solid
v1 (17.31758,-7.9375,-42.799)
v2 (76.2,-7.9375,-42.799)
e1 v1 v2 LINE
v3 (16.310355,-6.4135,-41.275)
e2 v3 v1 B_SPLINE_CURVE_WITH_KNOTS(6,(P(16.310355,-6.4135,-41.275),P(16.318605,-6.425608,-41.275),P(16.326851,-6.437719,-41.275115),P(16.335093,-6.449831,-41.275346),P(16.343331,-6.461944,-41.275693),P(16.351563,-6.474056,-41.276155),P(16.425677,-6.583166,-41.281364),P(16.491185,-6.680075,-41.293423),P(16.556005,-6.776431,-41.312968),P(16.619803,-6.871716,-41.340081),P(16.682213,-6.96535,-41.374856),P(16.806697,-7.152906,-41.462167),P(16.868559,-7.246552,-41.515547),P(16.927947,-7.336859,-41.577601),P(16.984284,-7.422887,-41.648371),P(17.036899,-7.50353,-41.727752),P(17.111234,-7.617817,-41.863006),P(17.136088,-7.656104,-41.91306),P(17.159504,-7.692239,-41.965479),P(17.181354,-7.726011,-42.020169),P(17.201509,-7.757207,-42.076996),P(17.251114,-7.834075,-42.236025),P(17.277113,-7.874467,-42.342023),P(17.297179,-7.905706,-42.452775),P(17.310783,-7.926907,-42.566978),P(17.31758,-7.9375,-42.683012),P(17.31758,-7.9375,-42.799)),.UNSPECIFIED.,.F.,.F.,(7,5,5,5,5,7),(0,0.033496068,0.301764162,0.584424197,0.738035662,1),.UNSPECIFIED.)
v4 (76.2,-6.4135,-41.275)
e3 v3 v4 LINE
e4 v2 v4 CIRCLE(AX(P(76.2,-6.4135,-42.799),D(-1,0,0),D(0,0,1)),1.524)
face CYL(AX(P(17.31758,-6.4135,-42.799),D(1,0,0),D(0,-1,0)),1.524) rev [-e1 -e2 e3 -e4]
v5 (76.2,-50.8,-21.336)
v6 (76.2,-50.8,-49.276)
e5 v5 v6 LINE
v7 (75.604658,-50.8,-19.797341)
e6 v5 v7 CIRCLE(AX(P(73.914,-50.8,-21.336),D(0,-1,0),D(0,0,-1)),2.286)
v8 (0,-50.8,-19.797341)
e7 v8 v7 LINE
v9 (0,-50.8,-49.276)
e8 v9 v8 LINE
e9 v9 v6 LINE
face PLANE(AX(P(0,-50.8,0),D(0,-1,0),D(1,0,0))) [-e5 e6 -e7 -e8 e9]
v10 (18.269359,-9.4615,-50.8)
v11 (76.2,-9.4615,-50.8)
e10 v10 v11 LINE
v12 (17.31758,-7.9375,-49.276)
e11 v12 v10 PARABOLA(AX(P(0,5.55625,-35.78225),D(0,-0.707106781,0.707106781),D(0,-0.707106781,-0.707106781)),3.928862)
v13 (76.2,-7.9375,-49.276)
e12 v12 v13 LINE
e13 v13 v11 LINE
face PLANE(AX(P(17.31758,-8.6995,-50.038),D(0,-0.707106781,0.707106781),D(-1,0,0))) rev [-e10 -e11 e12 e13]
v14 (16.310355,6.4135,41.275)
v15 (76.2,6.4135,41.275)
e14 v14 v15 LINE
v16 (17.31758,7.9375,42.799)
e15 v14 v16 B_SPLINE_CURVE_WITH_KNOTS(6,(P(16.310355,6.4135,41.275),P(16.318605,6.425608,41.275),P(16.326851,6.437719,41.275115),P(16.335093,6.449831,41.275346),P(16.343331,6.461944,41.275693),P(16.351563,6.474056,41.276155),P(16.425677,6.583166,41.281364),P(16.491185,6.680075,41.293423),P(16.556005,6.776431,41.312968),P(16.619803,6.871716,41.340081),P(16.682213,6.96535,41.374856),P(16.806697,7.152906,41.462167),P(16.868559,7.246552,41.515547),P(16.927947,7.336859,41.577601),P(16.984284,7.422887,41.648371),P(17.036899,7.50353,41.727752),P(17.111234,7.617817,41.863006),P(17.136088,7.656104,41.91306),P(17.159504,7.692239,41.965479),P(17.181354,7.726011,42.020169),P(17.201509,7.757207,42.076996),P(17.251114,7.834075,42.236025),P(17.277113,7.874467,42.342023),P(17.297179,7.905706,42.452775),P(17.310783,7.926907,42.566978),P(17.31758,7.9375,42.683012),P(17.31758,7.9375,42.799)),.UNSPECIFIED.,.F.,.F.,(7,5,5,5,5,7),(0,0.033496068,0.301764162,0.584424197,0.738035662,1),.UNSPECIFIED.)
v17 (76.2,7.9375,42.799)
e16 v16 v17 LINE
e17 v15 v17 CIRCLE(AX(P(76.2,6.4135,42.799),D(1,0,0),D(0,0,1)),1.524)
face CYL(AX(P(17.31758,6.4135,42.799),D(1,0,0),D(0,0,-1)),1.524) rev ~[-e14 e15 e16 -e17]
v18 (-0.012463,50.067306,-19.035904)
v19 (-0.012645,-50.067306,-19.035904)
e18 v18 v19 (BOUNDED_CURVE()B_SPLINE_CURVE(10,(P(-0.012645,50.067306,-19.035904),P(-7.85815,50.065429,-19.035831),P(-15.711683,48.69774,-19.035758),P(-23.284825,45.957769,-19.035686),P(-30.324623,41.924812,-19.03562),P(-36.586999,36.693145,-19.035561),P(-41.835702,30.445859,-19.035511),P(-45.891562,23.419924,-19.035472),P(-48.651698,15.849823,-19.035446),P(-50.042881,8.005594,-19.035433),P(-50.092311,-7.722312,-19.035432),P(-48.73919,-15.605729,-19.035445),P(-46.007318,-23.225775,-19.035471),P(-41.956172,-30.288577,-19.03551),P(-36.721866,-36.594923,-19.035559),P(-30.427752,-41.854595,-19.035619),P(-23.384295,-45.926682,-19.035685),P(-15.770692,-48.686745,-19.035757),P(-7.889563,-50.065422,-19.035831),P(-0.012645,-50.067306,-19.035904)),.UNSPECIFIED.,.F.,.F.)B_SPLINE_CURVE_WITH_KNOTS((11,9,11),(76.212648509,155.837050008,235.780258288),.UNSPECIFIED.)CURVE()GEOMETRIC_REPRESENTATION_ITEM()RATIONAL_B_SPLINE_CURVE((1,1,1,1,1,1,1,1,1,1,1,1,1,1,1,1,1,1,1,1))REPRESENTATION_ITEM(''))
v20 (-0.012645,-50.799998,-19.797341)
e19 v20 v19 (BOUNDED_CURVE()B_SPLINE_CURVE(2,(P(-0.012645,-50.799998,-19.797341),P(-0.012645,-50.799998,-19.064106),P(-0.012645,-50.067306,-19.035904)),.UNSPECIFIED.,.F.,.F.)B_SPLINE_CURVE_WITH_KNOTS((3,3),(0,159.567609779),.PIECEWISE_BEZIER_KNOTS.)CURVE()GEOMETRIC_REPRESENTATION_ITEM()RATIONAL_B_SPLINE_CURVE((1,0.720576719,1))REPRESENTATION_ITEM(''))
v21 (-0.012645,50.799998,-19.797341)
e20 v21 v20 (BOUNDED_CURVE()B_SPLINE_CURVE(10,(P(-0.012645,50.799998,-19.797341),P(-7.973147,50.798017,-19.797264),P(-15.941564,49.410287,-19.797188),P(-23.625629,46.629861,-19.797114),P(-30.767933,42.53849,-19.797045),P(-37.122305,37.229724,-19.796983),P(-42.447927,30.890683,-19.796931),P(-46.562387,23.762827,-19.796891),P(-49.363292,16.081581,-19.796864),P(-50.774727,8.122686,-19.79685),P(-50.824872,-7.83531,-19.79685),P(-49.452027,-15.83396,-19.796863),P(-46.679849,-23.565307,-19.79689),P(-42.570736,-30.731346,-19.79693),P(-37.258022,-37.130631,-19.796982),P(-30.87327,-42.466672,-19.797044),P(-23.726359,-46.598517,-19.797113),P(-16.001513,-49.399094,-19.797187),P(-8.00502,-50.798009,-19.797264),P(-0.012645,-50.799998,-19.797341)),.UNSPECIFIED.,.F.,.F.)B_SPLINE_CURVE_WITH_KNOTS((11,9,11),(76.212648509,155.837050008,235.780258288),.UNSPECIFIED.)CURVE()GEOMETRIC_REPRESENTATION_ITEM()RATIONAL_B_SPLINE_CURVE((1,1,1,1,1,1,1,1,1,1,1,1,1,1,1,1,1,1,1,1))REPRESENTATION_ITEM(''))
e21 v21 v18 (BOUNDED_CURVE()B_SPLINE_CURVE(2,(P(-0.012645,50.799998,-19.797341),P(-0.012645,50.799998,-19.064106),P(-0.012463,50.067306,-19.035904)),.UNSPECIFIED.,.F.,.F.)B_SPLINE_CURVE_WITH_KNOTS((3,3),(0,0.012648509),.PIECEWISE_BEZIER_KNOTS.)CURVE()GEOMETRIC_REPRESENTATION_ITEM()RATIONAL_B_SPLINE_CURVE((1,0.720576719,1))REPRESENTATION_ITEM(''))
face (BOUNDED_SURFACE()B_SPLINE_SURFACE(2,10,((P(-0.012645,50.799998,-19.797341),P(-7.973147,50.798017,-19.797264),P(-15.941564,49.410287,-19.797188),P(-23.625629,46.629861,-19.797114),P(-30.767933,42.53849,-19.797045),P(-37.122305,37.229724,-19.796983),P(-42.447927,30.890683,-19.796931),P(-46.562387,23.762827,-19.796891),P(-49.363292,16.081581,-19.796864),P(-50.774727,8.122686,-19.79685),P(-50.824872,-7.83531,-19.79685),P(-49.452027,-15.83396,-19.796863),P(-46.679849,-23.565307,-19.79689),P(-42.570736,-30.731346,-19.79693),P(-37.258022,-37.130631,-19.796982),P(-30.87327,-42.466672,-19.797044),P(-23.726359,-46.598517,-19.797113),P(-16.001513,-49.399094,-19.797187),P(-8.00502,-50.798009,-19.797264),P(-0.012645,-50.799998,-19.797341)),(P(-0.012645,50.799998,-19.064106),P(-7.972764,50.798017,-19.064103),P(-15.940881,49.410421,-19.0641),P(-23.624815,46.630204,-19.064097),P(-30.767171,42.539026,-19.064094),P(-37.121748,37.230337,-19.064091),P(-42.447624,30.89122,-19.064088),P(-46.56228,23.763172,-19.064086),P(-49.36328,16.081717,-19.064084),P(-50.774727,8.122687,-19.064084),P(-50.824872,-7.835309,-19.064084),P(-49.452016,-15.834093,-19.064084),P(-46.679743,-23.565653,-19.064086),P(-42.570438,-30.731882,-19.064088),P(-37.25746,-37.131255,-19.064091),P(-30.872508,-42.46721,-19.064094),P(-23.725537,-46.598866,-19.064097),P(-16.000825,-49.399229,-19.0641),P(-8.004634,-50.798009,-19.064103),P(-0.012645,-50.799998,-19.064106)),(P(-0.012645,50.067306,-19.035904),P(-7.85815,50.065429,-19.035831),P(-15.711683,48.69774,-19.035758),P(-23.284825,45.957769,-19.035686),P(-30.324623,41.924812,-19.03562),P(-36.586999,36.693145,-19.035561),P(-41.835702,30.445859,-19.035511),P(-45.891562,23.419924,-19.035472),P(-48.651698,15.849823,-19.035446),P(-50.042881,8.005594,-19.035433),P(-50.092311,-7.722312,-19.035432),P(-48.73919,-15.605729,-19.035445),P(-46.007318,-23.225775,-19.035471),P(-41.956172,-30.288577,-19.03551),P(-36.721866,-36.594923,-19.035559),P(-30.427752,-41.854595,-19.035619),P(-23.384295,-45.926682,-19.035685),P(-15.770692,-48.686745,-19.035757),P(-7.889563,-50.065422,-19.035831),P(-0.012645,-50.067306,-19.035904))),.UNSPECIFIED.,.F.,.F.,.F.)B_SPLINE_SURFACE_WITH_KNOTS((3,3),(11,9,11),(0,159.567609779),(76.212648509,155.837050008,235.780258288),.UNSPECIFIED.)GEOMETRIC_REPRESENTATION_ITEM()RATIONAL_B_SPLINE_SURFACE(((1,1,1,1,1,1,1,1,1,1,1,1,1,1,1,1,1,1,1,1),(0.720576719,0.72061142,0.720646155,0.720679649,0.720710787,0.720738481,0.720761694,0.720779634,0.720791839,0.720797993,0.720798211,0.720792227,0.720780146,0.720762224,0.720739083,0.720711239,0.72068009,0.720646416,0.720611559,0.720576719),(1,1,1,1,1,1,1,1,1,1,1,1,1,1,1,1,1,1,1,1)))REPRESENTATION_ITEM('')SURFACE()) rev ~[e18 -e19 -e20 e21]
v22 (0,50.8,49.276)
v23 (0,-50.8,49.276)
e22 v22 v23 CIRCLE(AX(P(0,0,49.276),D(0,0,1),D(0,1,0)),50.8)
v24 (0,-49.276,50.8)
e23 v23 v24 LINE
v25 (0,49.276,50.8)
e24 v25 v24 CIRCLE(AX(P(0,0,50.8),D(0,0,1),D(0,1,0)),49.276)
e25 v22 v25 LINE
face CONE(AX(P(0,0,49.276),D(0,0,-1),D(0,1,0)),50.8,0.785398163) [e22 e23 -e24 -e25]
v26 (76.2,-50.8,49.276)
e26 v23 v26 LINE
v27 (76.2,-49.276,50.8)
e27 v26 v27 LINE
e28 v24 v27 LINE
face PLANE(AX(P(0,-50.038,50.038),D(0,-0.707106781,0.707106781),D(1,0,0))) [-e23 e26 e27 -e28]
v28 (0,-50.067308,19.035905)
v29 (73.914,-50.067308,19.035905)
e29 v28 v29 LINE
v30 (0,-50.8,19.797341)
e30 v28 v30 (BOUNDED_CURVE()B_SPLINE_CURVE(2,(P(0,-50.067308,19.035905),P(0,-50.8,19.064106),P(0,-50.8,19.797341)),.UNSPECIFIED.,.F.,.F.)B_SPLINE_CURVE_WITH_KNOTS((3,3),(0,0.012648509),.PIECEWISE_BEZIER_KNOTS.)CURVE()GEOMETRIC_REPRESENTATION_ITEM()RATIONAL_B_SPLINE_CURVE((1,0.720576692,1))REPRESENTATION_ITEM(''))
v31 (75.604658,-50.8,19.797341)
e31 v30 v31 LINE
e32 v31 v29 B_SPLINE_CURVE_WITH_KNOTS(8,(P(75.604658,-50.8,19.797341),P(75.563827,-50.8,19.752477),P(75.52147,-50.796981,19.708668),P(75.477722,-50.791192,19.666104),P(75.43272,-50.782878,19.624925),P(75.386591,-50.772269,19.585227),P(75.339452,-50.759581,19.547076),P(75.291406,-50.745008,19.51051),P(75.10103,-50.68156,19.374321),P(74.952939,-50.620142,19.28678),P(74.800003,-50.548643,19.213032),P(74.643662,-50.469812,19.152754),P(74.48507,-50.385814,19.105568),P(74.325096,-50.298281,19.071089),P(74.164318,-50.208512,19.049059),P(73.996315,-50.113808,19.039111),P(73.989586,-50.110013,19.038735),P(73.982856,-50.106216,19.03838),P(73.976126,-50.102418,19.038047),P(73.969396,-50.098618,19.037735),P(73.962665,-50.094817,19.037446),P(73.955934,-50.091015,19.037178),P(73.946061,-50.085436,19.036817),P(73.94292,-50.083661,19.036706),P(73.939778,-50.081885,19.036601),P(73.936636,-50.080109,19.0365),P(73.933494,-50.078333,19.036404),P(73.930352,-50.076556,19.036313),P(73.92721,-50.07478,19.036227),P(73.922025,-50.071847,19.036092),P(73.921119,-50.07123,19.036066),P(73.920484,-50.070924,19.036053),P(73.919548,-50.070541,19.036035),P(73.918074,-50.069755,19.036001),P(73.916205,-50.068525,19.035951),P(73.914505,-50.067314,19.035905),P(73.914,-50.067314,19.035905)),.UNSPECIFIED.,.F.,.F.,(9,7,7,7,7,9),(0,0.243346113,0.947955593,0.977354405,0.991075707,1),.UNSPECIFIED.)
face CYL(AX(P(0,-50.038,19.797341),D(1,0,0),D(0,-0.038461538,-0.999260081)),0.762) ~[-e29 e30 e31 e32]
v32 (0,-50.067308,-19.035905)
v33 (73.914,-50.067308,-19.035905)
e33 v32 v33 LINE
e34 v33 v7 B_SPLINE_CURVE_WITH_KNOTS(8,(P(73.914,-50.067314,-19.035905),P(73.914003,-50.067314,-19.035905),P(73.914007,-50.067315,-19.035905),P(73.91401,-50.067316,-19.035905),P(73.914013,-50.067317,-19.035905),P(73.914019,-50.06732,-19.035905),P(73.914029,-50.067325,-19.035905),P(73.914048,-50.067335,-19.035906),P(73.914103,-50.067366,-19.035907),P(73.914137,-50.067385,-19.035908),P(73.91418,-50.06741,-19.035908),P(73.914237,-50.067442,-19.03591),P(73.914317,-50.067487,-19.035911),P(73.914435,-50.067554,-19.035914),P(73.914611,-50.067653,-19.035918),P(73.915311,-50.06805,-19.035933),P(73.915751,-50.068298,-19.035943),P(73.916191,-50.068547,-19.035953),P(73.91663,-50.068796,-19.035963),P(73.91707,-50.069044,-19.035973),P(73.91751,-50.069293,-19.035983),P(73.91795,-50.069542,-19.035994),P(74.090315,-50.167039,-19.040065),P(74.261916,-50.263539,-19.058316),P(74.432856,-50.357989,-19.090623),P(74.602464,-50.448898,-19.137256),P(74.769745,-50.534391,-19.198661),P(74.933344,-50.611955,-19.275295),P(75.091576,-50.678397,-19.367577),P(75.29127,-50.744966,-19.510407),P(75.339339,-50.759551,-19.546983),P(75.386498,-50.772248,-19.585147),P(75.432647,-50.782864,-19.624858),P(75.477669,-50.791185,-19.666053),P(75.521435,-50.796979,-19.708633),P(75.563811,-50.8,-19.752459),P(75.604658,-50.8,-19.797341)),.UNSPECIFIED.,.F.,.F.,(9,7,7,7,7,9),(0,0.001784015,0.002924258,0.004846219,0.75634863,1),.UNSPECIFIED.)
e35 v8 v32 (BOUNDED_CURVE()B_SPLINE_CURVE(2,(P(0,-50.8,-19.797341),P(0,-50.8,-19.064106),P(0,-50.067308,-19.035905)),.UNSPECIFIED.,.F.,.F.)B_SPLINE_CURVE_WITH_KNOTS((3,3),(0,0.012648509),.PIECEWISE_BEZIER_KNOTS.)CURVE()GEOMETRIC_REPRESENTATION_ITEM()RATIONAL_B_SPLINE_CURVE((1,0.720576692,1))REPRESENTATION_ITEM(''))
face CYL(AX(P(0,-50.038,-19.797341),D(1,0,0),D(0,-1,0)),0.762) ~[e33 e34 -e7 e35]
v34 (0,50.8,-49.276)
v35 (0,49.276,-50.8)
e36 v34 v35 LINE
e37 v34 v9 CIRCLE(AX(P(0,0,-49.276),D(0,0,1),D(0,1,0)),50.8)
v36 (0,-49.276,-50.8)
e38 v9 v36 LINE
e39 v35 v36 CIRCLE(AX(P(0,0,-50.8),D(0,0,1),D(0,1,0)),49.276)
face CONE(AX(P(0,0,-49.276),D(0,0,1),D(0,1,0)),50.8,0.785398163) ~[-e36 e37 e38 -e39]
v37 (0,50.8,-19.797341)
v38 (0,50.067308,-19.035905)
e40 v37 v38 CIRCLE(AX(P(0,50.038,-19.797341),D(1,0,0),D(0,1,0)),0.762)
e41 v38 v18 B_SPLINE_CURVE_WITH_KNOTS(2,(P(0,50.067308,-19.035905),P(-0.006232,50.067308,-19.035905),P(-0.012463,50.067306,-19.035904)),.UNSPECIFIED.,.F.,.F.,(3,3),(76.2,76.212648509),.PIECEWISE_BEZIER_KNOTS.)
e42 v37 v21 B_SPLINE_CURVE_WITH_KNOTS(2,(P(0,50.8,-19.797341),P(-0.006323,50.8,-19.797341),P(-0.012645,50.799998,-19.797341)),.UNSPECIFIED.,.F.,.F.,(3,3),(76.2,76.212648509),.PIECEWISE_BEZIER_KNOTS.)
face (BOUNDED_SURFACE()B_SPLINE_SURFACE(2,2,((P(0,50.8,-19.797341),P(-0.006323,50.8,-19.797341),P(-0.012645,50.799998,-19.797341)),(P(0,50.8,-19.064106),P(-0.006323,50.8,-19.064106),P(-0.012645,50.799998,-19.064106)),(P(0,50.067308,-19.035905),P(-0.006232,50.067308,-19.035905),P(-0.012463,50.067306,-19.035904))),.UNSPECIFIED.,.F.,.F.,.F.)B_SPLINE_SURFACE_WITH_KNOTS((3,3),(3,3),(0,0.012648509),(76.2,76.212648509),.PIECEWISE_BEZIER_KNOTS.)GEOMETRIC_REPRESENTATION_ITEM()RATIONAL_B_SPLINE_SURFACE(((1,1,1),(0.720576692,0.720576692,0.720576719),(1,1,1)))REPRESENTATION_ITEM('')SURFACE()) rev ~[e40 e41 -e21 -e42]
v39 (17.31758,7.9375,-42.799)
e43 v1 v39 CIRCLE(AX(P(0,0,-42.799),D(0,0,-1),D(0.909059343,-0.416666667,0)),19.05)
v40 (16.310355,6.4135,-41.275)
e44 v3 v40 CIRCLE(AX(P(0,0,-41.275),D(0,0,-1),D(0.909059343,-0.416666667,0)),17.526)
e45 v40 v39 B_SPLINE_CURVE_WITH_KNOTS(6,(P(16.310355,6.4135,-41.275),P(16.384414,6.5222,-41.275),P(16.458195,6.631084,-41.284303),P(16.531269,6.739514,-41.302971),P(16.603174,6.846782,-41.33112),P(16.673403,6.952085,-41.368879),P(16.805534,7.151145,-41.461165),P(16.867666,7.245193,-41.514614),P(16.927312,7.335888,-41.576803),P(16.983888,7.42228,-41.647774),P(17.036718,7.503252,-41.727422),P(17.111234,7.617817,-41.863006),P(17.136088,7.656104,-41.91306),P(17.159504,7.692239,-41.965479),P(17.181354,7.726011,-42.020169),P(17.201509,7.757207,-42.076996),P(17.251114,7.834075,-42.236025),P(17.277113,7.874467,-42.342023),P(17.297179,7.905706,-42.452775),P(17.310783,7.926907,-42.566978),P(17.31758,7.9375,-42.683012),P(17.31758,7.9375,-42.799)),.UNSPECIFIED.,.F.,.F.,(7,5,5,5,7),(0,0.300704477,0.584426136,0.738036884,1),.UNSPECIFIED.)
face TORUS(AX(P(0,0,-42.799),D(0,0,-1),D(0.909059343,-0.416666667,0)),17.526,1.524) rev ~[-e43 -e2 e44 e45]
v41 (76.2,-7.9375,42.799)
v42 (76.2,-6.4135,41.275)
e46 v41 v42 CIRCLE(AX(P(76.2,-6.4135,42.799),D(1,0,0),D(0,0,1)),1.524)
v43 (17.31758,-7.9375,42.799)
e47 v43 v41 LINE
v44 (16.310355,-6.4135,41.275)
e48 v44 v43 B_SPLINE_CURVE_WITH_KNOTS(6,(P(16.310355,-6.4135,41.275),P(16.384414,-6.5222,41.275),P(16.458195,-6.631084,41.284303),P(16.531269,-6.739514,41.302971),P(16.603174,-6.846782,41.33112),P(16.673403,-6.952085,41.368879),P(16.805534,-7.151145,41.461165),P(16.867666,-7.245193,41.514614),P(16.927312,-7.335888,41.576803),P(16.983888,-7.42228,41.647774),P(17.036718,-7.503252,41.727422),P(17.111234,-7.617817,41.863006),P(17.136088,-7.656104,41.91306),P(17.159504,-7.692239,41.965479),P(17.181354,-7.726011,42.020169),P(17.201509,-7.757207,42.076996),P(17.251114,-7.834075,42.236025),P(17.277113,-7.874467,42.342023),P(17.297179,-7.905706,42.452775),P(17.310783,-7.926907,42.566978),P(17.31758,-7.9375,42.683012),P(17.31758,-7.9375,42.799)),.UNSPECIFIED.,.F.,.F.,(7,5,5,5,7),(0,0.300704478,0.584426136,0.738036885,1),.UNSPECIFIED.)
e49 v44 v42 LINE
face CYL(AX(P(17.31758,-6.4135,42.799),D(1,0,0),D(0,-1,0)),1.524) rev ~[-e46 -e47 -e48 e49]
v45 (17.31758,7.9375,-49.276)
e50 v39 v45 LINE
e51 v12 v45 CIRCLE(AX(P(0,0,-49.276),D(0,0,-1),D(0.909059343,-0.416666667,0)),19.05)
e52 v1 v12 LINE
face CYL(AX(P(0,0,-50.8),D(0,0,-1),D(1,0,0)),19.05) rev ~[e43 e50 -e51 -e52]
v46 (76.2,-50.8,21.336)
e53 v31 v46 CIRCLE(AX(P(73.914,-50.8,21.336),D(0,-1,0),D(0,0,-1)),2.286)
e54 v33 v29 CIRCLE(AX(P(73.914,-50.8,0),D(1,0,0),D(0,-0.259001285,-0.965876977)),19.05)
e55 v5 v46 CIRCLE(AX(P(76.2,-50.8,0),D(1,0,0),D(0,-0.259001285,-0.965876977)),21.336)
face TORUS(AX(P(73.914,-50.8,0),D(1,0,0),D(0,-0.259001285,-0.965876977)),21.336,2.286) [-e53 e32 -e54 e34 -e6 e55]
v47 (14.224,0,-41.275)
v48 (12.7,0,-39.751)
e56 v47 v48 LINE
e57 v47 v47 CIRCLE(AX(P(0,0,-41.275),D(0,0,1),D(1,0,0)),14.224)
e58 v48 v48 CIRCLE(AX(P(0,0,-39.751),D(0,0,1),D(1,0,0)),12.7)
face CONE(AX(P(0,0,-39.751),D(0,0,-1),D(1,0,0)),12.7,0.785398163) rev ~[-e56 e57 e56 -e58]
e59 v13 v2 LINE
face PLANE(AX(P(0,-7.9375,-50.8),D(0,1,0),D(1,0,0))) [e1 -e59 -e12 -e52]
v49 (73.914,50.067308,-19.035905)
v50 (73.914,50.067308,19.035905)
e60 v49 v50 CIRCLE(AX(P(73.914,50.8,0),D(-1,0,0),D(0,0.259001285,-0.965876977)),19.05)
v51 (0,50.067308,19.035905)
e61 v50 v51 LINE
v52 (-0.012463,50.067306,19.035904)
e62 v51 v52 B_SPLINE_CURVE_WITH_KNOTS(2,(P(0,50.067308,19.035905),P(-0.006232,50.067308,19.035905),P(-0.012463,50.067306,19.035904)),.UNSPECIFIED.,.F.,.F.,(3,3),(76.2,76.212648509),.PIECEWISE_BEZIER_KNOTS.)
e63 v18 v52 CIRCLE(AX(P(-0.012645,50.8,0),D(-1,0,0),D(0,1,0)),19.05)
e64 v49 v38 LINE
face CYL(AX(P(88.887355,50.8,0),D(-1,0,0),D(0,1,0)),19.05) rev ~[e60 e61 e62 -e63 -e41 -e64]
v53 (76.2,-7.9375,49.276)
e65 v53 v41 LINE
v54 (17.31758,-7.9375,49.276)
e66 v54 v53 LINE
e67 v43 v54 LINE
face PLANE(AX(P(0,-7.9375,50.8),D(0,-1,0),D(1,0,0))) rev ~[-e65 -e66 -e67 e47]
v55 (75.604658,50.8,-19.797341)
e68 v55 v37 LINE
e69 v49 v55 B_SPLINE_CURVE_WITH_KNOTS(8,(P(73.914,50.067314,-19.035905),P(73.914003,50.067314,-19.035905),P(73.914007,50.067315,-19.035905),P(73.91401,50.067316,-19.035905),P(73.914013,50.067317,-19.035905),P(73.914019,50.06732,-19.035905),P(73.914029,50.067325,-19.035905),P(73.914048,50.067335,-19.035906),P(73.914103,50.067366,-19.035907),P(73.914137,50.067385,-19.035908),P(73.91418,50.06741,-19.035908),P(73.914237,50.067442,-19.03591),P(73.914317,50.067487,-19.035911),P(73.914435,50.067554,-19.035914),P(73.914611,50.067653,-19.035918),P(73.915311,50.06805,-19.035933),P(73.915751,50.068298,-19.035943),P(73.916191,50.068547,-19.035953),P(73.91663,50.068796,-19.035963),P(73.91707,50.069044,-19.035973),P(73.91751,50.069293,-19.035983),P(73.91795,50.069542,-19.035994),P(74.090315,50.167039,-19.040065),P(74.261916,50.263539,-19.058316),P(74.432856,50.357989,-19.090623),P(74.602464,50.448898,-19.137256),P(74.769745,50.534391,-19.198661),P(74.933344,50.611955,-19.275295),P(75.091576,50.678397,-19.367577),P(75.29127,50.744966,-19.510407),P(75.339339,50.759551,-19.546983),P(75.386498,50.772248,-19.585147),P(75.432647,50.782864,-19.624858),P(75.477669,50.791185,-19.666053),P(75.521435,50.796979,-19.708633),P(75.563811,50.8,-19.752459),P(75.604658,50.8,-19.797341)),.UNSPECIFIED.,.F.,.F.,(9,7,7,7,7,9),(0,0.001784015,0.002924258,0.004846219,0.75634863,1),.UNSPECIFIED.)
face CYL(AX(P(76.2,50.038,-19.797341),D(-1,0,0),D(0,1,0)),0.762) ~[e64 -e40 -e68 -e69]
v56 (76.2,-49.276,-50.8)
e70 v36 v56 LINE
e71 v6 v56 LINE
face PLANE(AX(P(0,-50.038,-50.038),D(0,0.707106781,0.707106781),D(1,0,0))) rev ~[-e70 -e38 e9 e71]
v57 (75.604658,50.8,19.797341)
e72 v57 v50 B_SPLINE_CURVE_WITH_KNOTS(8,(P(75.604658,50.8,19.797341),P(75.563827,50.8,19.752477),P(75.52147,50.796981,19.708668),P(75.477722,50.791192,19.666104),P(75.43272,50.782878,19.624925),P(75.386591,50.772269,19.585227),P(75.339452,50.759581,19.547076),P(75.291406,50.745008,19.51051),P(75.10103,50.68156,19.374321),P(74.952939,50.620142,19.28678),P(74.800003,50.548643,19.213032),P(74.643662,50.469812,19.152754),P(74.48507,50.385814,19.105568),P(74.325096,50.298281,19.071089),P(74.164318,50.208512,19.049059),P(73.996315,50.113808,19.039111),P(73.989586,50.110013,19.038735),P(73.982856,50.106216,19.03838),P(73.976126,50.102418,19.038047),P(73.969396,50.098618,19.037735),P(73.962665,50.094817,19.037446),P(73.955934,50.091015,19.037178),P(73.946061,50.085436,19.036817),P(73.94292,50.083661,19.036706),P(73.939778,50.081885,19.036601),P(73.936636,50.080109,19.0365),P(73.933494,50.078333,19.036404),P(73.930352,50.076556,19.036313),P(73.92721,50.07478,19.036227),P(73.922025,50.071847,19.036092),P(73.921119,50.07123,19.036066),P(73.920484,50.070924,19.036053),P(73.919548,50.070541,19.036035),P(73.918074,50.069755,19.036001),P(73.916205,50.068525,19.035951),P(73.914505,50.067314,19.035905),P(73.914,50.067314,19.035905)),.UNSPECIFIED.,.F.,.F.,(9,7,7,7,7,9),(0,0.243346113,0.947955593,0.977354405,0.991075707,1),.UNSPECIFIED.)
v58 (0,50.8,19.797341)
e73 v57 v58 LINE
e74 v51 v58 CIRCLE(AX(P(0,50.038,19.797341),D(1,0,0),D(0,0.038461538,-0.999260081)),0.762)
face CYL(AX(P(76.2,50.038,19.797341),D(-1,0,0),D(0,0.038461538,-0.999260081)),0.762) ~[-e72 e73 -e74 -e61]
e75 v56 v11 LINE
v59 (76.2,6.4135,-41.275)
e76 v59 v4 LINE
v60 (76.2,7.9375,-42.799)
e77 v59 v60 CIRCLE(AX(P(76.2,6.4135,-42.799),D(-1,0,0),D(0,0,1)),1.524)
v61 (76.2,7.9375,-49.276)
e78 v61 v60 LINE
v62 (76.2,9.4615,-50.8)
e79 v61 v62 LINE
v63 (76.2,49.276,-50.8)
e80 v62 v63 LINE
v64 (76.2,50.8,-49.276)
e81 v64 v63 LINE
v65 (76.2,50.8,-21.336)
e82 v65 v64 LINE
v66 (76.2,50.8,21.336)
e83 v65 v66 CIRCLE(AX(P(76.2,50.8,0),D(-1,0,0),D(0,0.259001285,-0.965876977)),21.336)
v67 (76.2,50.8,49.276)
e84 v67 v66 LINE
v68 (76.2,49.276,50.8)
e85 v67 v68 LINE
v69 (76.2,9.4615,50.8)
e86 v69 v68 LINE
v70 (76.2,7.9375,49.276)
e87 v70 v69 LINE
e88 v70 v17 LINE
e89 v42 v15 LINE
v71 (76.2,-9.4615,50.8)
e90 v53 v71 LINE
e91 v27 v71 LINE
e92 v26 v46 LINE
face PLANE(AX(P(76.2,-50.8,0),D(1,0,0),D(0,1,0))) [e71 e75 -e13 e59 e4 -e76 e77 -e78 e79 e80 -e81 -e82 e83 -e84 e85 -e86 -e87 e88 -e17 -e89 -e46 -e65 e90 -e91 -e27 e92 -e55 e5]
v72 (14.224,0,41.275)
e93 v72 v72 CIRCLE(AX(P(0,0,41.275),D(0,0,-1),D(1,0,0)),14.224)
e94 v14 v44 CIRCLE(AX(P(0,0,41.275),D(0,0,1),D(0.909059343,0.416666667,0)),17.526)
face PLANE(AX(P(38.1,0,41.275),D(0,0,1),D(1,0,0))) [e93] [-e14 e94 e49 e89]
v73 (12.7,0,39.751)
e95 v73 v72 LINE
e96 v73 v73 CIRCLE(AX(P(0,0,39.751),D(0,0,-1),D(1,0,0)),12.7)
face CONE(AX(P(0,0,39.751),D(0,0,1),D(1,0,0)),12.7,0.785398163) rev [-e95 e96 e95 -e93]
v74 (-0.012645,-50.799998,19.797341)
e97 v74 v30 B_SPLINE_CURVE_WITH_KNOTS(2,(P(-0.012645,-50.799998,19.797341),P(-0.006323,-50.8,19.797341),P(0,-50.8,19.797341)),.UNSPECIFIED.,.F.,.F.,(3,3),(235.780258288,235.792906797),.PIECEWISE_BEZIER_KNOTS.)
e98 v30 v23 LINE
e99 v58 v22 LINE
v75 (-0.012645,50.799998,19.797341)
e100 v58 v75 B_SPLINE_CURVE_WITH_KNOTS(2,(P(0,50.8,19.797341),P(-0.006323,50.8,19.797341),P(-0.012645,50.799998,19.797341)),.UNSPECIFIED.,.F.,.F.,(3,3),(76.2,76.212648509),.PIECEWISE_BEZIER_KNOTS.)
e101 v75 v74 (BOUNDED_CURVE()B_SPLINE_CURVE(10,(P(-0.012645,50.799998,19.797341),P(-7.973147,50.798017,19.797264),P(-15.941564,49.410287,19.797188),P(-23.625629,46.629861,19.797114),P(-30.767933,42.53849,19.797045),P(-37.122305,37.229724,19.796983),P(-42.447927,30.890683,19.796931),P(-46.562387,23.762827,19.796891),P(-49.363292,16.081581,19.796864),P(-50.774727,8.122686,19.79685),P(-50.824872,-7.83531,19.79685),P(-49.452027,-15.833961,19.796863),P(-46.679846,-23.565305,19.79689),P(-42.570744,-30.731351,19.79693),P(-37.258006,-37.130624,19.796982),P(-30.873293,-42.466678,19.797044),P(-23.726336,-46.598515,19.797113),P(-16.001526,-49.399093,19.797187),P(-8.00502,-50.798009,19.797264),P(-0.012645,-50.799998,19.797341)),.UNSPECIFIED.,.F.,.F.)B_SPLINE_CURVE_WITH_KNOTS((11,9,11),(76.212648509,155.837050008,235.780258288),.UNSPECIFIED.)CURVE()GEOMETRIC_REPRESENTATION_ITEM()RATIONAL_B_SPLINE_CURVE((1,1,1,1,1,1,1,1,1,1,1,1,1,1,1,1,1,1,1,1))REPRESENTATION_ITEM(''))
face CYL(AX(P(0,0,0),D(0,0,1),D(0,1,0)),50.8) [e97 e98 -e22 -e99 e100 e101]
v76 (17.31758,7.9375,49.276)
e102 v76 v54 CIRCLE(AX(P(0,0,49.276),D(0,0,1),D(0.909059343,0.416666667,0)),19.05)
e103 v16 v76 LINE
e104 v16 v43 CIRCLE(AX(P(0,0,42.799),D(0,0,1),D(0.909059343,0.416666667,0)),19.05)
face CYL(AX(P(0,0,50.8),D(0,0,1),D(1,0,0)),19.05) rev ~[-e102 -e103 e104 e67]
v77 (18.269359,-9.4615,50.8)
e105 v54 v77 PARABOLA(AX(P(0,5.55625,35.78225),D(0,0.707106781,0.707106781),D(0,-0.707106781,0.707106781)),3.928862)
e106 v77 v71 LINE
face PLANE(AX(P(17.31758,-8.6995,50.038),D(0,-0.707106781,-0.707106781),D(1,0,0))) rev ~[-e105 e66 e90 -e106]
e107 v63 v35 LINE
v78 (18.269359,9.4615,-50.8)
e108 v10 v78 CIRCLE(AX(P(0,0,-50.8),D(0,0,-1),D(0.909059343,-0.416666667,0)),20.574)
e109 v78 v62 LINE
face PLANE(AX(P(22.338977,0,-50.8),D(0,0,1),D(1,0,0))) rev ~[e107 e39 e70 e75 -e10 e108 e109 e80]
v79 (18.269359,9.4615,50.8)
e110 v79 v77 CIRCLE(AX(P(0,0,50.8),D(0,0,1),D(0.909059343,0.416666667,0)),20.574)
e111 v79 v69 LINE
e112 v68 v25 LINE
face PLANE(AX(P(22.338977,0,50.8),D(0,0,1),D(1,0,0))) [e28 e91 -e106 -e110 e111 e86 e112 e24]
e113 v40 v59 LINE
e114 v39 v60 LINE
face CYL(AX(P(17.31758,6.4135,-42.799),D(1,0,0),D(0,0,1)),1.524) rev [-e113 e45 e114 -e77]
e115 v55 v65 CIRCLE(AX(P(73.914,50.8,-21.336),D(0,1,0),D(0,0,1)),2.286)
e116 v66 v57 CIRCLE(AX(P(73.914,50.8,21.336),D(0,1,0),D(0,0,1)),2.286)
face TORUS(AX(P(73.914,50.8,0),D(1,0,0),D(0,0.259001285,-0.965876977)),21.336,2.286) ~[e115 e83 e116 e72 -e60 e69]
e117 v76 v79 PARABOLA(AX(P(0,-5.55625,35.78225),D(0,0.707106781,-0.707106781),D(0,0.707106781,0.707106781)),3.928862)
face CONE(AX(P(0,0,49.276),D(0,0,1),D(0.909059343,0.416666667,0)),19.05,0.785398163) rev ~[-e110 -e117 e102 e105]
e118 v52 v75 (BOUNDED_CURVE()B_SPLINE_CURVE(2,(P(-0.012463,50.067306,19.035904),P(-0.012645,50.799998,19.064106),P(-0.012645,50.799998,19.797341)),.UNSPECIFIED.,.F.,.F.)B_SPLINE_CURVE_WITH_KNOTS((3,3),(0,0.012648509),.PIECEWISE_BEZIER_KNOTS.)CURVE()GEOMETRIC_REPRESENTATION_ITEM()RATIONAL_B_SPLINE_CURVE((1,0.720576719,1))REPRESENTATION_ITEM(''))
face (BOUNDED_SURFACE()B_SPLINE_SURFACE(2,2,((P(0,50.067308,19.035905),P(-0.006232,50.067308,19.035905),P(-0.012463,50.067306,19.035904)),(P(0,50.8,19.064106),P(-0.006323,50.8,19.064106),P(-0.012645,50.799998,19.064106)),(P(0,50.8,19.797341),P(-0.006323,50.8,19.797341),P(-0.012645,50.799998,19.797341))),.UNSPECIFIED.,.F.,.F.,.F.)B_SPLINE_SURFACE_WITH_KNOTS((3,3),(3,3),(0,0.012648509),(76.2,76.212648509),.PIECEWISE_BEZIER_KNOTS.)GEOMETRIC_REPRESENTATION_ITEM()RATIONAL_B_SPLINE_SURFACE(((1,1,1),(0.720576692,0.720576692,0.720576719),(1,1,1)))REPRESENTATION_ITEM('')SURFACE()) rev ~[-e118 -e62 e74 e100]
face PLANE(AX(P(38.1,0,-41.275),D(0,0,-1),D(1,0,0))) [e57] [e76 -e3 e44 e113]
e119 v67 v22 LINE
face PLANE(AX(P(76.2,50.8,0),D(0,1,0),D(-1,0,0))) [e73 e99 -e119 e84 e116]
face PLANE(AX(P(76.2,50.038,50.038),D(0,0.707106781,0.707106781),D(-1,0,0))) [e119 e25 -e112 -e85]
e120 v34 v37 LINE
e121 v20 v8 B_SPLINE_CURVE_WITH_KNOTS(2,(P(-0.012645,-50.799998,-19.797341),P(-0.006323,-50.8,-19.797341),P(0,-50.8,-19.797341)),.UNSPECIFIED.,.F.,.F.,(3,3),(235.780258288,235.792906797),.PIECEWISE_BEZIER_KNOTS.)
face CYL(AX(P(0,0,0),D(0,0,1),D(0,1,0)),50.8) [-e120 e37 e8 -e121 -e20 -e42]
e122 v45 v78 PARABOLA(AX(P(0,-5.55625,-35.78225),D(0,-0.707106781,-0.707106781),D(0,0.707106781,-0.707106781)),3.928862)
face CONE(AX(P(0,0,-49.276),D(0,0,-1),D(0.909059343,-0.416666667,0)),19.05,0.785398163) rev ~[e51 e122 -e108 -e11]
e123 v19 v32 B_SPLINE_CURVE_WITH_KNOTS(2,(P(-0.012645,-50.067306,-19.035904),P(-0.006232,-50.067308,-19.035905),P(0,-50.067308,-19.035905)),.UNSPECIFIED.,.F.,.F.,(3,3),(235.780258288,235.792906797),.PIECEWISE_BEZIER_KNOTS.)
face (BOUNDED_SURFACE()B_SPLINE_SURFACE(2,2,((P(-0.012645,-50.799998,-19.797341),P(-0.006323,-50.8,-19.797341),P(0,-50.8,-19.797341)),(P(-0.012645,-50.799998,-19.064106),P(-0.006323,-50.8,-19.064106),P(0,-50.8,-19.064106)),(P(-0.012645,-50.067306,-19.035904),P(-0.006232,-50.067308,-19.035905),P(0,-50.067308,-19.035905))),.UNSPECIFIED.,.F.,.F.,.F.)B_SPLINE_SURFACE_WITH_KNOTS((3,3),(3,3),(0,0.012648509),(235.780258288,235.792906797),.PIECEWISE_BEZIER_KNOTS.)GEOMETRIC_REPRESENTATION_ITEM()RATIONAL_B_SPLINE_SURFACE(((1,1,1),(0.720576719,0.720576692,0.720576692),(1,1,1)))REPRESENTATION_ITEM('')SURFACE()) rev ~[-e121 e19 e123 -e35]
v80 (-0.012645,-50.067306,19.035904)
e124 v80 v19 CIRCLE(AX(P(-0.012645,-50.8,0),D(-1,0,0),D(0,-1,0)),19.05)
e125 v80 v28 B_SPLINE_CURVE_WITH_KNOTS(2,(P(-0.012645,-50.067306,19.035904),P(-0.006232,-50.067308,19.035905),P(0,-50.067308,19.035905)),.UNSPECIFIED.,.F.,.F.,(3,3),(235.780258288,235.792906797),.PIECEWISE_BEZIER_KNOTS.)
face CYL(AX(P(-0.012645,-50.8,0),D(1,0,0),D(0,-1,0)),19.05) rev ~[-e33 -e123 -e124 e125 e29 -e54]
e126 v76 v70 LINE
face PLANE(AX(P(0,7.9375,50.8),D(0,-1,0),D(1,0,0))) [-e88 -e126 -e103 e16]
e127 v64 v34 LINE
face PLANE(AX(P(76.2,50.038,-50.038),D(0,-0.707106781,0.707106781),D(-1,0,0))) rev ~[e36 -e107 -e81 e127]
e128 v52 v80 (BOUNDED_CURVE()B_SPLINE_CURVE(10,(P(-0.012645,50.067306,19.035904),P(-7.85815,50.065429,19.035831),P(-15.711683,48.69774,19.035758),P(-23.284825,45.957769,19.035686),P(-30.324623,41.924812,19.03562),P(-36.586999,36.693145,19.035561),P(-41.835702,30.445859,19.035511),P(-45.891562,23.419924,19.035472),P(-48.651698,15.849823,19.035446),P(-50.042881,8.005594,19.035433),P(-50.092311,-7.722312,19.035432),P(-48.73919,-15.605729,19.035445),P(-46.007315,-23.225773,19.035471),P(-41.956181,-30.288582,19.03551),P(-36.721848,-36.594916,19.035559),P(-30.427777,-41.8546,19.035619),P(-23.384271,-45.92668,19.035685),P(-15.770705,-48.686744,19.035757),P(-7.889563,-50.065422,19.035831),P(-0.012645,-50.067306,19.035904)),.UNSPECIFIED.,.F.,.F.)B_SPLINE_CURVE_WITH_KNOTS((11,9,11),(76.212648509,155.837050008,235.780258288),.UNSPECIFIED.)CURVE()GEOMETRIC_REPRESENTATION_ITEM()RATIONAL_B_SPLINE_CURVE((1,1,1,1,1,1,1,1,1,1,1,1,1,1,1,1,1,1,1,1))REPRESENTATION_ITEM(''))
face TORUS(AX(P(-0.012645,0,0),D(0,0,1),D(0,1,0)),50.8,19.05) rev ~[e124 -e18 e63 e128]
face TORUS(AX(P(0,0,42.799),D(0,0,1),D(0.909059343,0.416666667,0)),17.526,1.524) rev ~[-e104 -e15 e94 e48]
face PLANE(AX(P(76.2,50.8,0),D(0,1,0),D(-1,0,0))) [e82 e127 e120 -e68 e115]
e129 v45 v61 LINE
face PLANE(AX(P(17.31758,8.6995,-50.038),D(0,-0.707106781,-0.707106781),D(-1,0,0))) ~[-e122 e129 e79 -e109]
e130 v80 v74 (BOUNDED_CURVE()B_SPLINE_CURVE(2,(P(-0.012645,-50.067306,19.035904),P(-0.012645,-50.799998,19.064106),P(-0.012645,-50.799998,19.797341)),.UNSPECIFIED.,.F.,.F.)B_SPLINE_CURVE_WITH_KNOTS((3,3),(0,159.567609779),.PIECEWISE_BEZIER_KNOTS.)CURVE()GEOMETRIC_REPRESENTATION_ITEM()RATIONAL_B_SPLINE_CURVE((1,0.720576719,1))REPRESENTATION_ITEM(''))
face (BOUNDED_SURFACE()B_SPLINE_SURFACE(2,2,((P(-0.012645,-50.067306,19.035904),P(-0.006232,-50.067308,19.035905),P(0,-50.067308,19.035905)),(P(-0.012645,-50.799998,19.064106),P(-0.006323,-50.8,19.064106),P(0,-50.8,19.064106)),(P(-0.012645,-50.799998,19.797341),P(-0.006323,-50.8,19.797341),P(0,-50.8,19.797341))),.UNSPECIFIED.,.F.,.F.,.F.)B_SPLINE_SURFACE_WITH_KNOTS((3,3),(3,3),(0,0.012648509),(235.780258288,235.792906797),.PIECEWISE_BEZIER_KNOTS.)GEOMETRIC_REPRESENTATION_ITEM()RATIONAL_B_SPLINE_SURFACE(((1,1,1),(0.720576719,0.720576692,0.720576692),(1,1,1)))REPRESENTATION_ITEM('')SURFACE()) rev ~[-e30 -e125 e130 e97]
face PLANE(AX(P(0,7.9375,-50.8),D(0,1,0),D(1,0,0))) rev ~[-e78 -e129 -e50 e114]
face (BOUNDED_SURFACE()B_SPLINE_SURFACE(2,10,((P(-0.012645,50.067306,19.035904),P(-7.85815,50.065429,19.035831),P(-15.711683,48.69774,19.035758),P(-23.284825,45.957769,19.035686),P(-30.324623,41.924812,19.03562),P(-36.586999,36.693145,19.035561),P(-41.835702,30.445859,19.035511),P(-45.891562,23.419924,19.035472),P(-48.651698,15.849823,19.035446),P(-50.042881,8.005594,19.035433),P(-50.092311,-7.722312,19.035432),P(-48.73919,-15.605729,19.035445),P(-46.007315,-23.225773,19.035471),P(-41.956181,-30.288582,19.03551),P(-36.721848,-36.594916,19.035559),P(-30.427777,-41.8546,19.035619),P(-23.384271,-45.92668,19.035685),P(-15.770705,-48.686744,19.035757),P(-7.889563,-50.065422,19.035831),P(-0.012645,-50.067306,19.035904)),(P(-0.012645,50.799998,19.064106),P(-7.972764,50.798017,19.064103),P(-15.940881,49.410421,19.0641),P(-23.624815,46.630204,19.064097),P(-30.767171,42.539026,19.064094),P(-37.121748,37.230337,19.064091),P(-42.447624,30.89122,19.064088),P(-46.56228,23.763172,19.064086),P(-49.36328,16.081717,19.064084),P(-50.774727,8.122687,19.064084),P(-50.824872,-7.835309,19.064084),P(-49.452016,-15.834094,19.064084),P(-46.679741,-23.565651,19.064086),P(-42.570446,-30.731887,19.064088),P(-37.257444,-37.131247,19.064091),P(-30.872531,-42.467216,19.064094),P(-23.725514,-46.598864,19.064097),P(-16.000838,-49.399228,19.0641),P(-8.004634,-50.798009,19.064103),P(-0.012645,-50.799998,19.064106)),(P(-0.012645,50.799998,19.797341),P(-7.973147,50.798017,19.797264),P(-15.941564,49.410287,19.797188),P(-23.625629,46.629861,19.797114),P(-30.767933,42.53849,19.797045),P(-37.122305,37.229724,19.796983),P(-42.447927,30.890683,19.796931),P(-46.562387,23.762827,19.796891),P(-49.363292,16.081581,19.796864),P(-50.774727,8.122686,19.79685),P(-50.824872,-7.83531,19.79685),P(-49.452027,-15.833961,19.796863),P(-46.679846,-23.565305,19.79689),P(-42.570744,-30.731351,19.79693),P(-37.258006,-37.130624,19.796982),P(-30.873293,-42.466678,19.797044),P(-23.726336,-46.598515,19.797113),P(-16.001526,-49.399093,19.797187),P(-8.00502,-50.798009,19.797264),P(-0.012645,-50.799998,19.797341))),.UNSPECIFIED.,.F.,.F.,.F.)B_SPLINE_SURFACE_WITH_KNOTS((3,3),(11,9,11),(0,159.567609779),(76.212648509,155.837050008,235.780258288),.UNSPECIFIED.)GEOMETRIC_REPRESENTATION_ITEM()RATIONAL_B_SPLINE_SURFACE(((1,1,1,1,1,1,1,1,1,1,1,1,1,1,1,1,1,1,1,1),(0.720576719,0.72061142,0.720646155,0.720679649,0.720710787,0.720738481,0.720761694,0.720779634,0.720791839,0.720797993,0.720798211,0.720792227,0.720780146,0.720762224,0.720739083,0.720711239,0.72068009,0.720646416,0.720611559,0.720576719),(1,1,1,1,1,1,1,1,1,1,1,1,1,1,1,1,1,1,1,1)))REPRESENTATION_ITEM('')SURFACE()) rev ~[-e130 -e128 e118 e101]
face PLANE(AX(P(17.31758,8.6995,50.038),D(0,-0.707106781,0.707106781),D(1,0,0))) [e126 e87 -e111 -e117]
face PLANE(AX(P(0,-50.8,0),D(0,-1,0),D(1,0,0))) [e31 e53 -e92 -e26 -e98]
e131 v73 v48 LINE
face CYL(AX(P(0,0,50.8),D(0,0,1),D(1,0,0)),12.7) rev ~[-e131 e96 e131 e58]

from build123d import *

# Parameters (mm, degrees)
F1_DEPTH     = 50.8
F4_R         = 19.05
F6_R         = 12.7
F7_DEPTH     = 101.6010001
F8_R         = 19.05
F9_DEPTH     = 9.525
F10_R        = 19.05
F11_DEPTH    = 9.525
F12_SIZE     = 1.524
F13_R        = 0.762
F14_T2_ANGLE = 210.0216204264
F14_T4_ANGLE = 210.0216204264
F15_W        = 76.2
F15_H        = 15.875
F16_DEPTH    = 9.525
F17_W        = 76.2
F17_H        = 15.875
F18_DEPTH    = 9.525
F19_SIZE     = 1.524
F20_R        = 1.524


# Not quite as in the source:
# - a fillet or chamfer that OpenCascade refuses, or shapes differently, is made with other operations: its cross-section is extruded or revolved along the edge and cut away or added


with BuildPart() as f1:
    # F0 (on Top) → F1 (new body, symmetric)
    with BuildSketch(Plane.XY):
        with BuildLine():
            Line((76.2, 50.8), (0, 50.8))
            ThreePointArc((0, 50.8), (-50.8, 0), (0, -50.8))
            Line((0, -50.8), (76.2, -50.8))
            Line((76.2, -50.8), (76.2, 50.8))
        make_face()
    extrude(amount=F1_DEPTH, both=True)

    # F5: sweep along a path in F2
    with BuildLine(Plane.XY) as f5_path:
        Line((88.8873545716, 50.8), (-0.0126454284, 50.8))
        ThreePointArc((-0.0126454284, 50.8), (-50.8126454284, 0), (-0.0126454284, -50.8))
        Line((-0.0126454284, -50.8), (88.8873545716, -50.8))
    # F4 (on line) → F5 (sweep, cut)
    with BuildSketch(Plane.YZ.offset(88.8873545716)):
        with Locations((50.8, 0)):
            Circle(F4_R)
    sweep(path=f5_path.line, mode=Mode.SUBTRACT)

    # F6 (on face) → F7 (cut, through all)
    with BuildSketch(Plane.XY.offset(50.8)):
        Circle(F6_R)
    extrude(amount=-F7_DEPTH, mode=Mode.SUBTRACT)

    # F8 (on face) → F9 (cut)
    with BuildSketch(Plane.XY.offset(50.8)):
        Circle(F8_R)
    extrude(amount=-F9_DEPTH, mode=Mode.SUBTRACT)

    # F10 (on face) → F11 (cut)
    with BuildSketch(Plane(origin=(0, 0, -50.8), x_dir=(1, 0, 0), z_dir=(0, 0, -1))):
        Circle(F10_R)
    extrude(amount=-F11_DEPTH, mode=Mode.SUBTRACT)

    # F12
    f12_edges = [f1.edges().sort_by_distance(p)[0] for p in [
        (38.1, -50.8, 50.8),
        (38.1, 50.8, -50.8),
    ]]
    chamfer(f12_edges, length=F12_SIZE)

    # F13
    f13_edges = [f1.edges().sort_by_distance(p)[0] for p in [
        (38.1, -50.8, -19.05),
        (38.1, -50.8, 19.05),
        (-0.006323, 50.799999, -19.05),
        (-50.8, 0, -19.049996),
        (-0.006323, -50.799999, -19.05),
        (-0.006323, -50.799999, 19.05),
        (38.1, 50.8, -19.05),
        (-0.006323, 50.799999, 19.05),
        (38.1, 50.8, 19.05),
        (-50.8, 0, 19.049996),
    ]]
    fillet(f13_edges, radius=F13_R)

    # F14: fillet of radius 2.286 on 2 edges, made by hand

    # F14_s1 → F14_t2 (revolve, cut)
    with BuildSketch(Plane(origin=(0, 47.3922513753, 12.7082996284), x_dir=(1, 0, 0), z_dir=(0, 0.9658769767, 0.2590012854))):
        with BuildLine():
            ThreePointArc((76.2, 34.4932652985), (75.5304461018, 32.8768191967), (73.914, 32.2072652985))
            Line((73.914, 32.2072652985), (76.2, 32.2072652985))
            Line((76.2, 32.2072652985), (76.2, 34.4932652985))
        make_face()
    revolve(axis=Axis((76.2, 50.8, 0), (-1, 0, 0)), revolution_arc=F14_T2_ANGLE, mode=Mode.SUBTRACT)

    # F14_s3 → F14_t4 (revolve, cut)
    with BuildSketch(Plane(origin=(0, -47.3922513753, 12.7082996284), x_dir=(1, 0, 0), z_dir=(0, -0.9658769767, 0.2590012854))):
        with BuildLine():
            ThreePointArc((76.2, -34.4932652985), (75.5304461018, -32.8768191967), (73.914, -32.2072652985))
            Line((73.914, -32.2072652985), (76.2, -32.2072652985))
            Line((76.2, -32.2072652985), (76.2, -34.4932652985))
        make_face()
    revolve(axis=Axis((76.2, -50.8, 0), (1, 0, 0)), revolution_arc=F14_T4_ANGLE, mode=Mode.SUBTRACT)

    # F15 (on face) → F16 (cut)
    with BuildSketch(Plane(origin=(0, 0, -50.8), x_dir=(1, 0, 0), z_dir=(0, 0, -1))):
        with Locations((38.1, 0)):
            Rectangle(F15_W, F15_H)
    extrude(amount=-F16_DEPTH, mode=Mode.SUBTRACT)

    # F17 (on face) → F18 (cut)
    with BuildSketch(Plane.XY.offset(50.8)):
        with Locations((38.1, 0)):
            Rectangle(F17_W, F17_H)
    extrude(amount=-F18_DEPTH, mode=Mode.SUBTRACT)

    # F19
    f19_edges = [f1.edges().sort_by_distance(p)[0] for p in [
        (-19.05, 0, 50.8),
        (46.75879, 7.9375, 50.8),
        (46.75879, -7.9375, 50.8),
        (-12.7, 0, 41.275),
        (-19.05, 0, -50.8),
        (-12.7, 0, -41.275),
        (46.75879, -7.9375, -50.8),
        (46.75879, 7.9375, -50.8),
    ]]
    chamfer(f19_edges, length=F19_SIZE)

    # F20
    f20_edges = [f1.edges().sort_by_distance(p)[0] for p in [
        (-19.05, 0, -41.275),
        (46.75879, -7.9375, -41.275),
        (46.75879, 7.9375, -41.275),
        (-19.05, 0, 41.275),
        (46.75879, 7.9375, 41.275),
        (46.75879, -7.9375, 41.275),
    ]]
    fillet(f20_edges, radius=F20_R)


solid = f1.part
